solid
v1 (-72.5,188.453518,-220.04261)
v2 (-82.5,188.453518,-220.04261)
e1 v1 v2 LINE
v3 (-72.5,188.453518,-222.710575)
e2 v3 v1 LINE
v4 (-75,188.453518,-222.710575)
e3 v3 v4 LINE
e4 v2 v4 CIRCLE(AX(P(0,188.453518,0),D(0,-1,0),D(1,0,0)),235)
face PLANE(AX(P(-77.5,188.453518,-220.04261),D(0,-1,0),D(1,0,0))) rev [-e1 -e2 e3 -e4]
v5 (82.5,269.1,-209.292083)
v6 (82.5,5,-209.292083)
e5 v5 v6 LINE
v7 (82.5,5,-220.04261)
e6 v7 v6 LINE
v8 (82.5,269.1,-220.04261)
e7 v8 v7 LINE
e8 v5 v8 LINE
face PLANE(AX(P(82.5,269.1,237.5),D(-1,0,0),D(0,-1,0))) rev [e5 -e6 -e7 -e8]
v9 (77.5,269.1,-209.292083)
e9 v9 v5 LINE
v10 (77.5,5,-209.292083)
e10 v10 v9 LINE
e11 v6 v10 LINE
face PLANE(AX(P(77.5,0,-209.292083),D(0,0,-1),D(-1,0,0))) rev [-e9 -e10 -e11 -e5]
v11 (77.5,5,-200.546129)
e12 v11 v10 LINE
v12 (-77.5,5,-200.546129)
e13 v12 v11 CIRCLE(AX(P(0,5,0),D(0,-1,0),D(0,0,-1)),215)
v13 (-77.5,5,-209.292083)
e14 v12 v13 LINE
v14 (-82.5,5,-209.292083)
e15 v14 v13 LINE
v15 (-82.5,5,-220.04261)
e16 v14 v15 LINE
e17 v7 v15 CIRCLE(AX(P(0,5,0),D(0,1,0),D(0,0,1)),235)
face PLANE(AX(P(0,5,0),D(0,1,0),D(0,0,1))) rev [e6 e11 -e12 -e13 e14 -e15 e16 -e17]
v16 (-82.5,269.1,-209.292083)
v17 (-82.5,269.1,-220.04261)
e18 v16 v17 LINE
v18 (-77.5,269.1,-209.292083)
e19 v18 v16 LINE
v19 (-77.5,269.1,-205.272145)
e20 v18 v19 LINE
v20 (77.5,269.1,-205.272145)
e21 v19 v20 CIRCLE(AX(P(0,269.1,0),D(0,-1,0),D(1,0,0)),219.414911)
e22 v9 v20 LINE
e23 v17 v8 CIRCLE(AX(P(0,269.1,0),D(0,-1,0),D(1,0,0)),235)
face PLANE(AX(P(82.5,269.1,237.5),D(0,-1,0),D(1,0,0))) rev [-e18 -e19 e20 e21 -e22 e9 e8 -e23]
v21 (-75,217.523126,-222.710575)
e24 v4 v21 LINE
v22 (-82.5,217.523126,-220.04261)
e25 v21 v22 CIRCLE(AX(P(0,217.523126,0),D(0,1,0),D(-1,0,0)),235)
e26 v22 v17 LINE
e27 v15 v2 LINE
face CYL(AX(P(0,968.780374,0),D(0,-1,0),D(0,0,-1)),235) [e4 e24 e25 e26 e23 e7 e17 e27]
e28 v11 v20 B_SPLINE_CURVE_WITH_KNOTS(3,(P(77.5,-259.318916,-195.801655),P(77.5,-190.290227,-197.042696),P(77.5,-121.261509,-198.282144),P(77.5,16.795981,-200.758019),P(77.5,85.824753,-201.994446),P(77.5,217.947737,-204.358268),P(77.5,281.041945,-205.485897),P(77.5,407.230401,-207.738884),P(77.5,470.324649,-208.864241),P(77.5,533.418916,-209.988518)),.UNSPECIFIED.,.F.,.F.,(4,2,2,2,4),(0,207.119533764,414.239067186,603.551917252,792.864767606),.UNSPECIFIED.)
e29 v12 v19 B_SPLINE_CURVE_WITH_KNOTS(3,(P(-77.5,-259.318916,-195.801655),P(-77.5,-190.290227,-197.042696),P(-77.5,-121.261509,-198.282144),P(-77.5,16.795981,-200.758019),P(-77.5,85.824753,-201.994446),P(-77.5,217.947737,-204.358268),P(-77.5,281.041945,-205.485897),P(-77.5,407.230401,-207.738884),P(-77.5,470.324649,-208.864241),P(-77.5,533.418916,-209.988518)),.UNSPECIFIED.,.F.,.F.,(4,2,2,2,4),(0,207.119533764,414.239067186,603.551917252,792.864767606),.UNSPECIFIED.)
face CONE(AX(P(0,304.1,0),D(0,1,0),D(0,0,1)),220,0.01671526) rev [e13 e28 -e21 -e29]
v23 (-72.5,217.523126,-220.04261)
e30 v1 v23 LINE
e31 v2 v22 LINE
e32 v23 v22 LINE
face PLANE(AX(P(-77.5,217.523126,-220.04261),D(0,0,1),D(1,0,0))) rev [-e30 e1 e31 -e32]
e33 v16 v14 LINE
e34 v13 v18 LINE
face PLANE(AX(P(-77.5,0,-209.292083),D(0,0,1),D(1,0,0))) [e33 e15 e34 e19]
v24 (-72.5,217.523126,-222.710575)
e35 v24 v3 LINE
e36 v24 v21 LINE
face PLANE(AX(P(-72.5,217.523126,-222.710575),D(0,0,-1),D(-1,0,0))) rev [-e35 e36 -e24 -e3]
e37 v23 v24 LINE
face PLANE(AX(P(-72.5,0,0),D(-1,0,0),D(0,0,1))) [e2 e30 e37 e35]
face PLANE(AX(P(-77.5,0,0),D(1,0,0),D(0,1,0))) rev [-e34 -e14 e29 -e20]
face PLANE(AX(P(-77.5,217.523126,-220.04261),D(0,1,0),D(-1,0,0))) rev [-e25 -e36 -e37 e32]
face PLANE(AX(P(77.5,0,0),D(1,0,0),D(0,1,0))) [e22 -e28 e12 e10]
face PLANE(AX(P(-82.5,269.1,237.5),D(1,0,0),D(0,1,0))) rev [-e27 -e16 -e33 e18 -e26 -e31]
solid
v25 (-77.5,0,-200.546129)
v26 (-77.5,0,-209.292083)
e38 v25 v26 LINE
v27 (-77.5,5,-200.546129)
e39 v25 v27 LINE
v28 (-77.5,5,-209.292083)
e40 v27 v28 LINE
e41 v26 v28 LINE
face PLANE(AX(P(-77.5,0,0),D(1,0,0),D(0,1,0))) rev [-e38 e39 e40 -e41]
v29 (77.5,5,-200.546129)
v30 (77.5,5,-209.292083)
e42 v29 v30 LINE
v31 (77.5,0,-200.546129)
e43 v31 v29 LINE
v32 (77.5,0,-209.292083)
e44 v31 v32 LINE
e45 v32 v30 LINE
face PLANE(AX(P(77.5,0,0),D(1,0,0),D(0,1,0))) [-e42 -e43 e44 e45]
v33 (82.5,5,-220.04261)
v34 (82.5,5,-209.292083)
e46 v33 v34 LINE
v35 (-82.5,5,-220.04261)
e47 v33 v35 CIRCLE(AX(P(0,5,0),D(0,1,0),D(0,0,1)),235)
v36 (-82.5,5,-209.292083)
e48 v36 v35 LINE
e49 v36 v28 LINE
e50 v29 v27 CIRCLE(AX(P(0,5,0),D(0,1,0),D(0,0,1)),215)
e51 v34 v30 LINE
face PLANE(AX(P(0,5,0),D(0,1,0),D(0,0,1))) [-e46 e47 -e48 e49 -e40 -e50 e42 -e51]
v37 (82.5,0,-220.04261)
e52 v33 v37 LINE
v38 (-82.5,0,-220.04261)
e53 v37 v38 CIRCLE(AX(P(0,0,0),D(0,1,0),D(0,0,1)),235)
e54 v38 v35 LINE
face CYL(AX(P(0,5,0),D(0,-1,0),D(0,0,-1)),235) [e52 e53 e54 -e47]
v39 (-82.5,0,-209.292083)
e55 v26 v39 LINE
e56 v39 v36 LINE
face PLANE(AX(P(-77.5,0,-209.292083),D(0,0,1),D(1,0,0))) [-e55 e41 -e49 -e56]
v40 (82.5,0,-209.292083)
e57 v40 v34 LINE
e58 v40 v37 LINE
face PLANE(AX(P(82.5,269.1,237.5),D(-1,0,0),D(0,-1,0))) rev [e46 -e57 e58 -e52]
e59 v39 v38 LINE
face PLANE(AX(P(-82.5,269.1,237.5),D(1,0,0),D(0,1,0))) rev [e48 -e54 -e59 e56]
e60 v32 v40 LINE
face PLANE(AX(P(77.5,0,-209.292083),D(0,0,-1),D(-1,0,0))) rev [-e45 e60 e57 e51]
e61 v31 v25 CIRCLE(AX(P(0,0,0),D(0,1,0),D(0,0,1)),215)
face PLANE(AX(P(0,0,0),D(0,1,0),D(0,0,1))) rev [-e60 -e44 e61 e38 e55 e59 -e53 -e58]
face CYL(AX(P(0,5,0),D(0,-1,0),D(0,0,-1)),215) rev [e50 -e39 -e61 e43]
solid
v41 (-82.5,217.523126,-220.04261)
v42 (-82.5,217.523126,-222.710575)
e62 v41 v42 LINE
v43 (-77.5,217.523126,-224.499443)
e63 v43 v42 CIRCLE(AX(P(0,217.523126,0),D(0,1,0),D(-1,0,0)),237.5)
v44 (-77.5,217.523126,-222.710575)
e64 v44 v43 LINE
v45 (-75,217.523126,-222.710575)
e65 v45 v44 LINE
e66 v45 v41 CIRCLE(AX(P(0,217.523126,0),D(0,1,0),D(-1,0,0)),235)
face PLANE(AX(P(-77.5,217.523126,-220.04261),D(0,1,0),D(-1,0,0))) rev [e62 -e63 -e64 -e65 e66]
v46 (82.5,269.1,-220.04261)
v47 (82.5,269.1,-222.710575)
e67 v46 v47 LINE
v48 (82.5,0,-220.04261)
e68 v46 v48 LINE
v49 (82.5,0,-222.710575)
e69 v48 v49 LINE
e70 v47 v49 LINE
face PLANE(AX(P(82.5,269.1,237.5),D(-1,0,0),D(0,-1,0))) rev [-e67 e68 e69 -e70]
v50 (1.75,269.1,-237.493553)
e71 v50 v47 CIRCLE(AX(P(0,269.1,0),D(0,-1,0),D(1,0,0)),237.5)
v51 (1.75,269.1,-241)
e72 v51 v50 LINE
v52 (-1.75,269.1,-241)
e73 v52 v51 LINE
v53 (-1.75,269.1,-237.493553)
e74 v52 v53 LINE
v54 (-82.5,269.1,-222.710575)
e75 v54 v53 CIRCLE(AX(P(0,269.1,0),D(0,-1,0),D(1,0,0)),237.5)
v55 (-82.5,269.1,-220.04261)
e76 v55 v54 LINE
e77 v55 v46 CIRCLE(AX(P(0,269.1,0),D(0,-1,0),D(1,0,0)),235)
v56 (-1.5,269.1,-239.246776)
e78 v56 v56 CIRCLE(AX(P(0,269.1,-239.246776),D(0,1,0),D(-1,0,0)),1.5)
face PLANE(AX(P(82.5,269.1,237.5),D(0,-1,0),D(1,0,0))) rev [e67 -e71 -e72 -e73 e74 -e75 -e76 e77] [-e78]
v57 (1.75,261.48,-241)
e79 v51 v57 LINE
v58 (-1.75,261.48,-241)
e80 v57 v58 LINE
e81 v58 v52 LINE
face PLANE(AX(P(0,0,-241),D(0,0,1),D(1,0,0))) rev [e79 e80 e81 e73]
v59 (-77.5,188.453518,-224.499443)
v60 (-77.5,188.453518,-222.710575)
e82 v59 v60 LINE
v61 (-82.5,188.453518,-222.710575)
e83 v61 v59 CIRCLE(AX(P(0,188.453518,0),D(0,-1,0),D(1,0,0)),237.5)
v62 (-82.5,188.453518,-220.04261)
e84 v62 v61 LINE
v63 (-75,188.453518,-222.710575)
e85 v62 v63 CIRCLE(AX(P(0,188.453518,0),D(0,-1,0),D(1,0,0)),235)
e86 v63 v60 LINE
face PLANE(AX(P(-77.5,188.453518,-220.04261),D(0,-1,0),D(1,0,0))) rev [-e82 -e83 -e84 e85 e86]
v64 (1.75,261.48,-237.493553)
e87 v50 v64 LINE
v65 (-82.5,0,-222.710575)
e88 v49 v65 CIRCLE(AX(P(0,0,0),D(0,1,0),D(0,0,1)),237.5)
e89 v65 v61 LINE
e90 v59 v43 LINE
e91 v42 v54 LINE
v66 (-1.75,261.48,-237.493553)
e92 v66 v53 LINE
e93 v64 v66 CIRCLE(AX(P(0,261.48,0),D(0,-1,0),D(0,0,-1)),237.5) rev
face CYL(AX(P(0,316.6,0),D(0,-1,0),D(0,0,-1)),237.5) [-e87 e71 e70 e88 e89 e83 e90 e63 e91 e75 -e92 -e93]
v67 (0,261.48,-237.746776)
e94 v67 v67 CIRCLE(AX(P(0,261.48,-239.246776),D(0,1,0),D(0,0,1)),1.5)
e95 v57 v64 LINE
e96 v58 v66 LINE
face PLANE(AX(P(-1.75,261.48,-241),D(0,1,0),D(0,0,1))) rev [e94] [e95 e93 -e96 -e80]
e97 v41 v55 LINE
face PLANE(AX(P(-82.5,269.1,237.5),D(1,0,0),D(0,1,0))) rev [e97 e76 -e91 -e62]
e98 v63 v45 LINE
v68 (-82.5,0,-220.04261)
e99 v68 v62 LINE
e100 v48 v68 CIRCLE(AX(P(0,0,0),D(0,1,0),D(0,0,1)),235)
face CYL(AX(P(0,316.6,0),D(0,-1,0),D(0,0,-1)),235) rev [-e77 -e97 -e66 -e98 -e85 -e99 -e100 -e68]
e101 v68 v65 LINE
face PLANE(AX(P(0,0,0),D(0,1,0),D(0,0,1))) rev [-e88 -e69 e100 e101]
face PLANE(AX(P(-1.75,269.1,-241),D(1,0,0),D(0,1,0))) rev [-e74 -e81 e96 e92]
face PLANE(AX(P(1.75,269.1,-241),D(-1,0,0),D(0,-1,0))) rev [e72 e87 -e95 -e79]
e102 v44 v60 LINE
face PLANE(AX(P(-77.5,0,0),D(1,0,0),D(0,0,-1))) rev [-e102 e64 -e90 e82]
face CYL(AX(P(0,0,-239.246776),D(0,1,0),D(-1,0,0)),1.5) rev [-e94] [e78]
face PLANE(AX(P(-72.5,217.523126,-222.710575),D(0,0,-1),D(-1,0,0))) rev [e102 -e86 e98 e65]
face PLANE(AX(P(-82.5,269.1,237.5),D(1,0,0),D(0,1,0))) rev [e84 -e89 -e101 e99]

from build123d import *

# Parameters (mm, degrees)
SKETCH1_R                            = 237.5
SKETCH1_R_2                          = 235
BOSS_EXTRUDE1_DEPTH                  = 316.6
SKETCH3_R                            = 235
SKETCH3_R_2                          = 215
BOSS_EXTRUDE2_DEPTH                  = 5
SKETCH7_R                            = 237.5
SKETCH7_R_2                          = 175
BOSS_EXTRUDE3_DEPTH                  = 2.5
SKETCH8_R                            = 235
SKETCH8_R_2                          = 175
BOSS_EXTRUDE4_DEPTH                  = 2.5
SKETCH9_R                            = 235
BOSS_EXTRUDE5_DEPTH                  = 299.1
CUT_EXTRUDE5_REACH                   = 621.561
SKETCH5_W                            = 42.50000009
SKETCH5_H                            = 45.600000066
CUT_EXTRUDE10_START                  = -475.0000001
CUT_EXTRUDE10_DEPTH                  = 475.0000001
CUT_EXTRUDE10_2_DEPTH                = 50.034190288
SKETCH16_W                           = 3.5
SKETCH16_H                           = 7.62
BOSS_EXTRUDE6_DEPTH                  = 3.5
BOSS_EXTRUDE6_DIRECTION_2_REACH      = 286.146
BOSS_EXTRUDE6_DIRECTION_2_END_RADIUS = 237.5
SKETCH17_R                           = 1.5
CUT_EXTRUDE11_DEPTH                  = 371.542926011
CUT_EXTRUDE15_DEPTH                  = 5
CUT_EXTRUDE16_DEPTH                  = 5
SKETCH20_W                           = 10.655659882
SKETCH20_H                           = 29.069608239
CUT_EXTRUDE17_DEPTH                  = 5
SKETCH21_W                           = 2.667965003
SKETCH21_H                           = 29.069608239
CUT_EXTRUDE18_DEPTH                  = 5


# Read off the part's stored shape, not the designer's step: Cut-Extrude10
with BuildPart() as part:
    # Sketch1 → Boss-Extrude1 (new body)
    with BuildSketch(Plane(origin=(0, 0, 0), x_dir=(1, 0, 0), z_dir=(0, 1, 0))):
        with Locations(Location((0, 0, 0), (0, 0, 270))):
            Circle(SKETCH1_R)
        with Locations(Location((0, 0, 0), (0, 0, 270))):
            Circle(SKETCH1_R_2, mode=Mode.SUBTRACT)
    extrude(amount=BOSS_EXTRUDE1_DEPTH)


with BuildPart() as body_2:
    # Sketch3 → Boss-Extrude2 (new body)
    with BuildSketch(Plane(origin=(0, 0, 0), x_dir=(1, 0, 0), z_dir=(0, 1, 0))):
        with Locations(Location((0, 0, 0), (0, 0, 270))):
            Circle(SKETCH3_R)
        with Locations(Location((0, 0, 0), (0, 0, 270))):
            Circle(SKETCH3_R_2, mode=Mode.SUBTRACT)
    extrude(amount=BOSS_EXTRUDE2_DEPTH)


with BuildPart() as body_3:
    # Sketch7 → Boss-Extrude3 (new body)
    with BuildSketch(Plane(origin=(0, 316.6, 0), x_dir=(1, 0, 0), z_dir=(0, 1, 0))):
        with Locations(Location((0, 0, 0), (0, 0, 270))):
            Circle(SKETCH7_R)
        with Locations(Location((0, 0, 0), (0, 0, 270))):
            Circle(SKETCH7_R_2, mode=Mode.SUBTRACT)
    extrude(amount=BOSS_EXTRUDE3_DEPTH)


with BuildPart() as body_4:
    # Sketch8 → Boss-Extrude4 (new body)
    with BuildSketch(Plane(origin=(0, 306.6, 0), x_dir=(1, 0, 0), z_dir=(0, 1, 0))):
        with Locations(Location((0, 0, 0), (0, 0, 270))):
            Circle(SKETCH8_R)
        with Locations(Location((0, 0, 0), (0, 0, 270))):
            Circle(SKETCH8_R_2, mode=Mode.SUBTRACT)
    extrude(amount=-BOSS_EXTRUDE4_DEPTH)


with BuildPart() as body_5:
    # Sketch9 → Boss-Extrude5 (new body)
    with BuildSketch(Plane(origin=(0, 5, 0), x_dir=(1, 0, 0), z_dir=(0, 1, 0))):
        with Locations(Location((0, 0, 0), (0, 0, 270))):
            Circle(SKETCH9_R)
    extrude(amount=BOSS_EXTRUDE5_DEPTH)

    # Sketch13 → Cut-Revolve2 (revolve, cut)
    with BuildSketch(Plane.XY, mode=Mode.PRIVATE) as cut_revolve2_sk:
        Polygon((0, 5), (-215, 5), (-220, 304.1), (0, 304.1), align=None)
    revolve(cut_revolve2_sk.sketch.rotate(Axis((0, 5, 0), (0, 1, 0)), 270), axis=Axis((0, 5, 0), (0, 1, 0)), mode=Mode.SUBTRACT)


with BuildPart() as cut_extrude5_tool:
    # Cut-Extrude5: up to this cone (the profile starts outside it)
    cut_extrude5_end = Plane(origin=(0, 22.8, 0), z_dir=(0, 1, 0)) * Cone(201.299589446, 229.295529243, 1674.717118689, mode=Mode.PRIVATE)
    # Sketch5 → Cut-Extrude5 (new, up to the surface)
    with BuildSketch(Plane.XY.offset(237.5), mode=Mode.PRIVATE) as cut_extrude5_sk1:
        with Locations((0, 22.800000033)):
            Rectangle(SKETCH5_W, SKETCH5_H)
    cut_extrude5_tool1 = extrude(cut_extrude5_sk1.sketch, amount=-CUT_EXTRUDE5_REACH, mode=Mode.PRIVATE) - cut_extrude5_end
    add(cut_extrude5_tool1.solids().sort_by_distance((0, 22.8, 237.5))[0])


with BuildPart() as part_1:
    add(part.part)

    # Cut-Extrude5: cut by cut_extrude5_tool
    add(cut_extrude5_tool.part, mode=Mode.SUBTRACT)


with BuildPart() as body_2_1:
    add(body_2.part)

    # Cut-Extrude5: cut by cut_extrude5_tool
    add(cut_extrude5_tool.part, mode=Mode.SUBTRACT)


with BuildPart() as body_5_1:
    add(body_5.part)

    # Cut-Extrude5: cut by cut_extrude5_tool
    add(cut_extrude5_tool.part, mode=Mode.SUBTRACT)


with BuildPart() as cut_extrude10_tool:
    # Cut-Extrude10 outline → Cut-Extrude10 (new body)
    with BuildSketch(Plane(origin=(0, 0, -237.5), x_dir=(-1, 0, 0), z_dir=(0, 0, -1)).offset(CUT_EXTRUDE10_START)):
        Polygon((-82.5, 269.1), (82.5, 269.1), (82.5, 5), (82.5, 0), (334.900743923, 0), (334.900743923, 341.395751283), (-301.356566018, 341.395751283), (-301.356566018, 0), (-82.5, 0), (-82.5, 5), align=None)
    extrude(amount=CUT_EXTRUDE10_DEPTH)


with BuildPart() as part_2:
    add(part_1.part)

    # Cut-Extrude10: cut by cut_extrude10_tool
    add(cut_extrude10_tool.part, mode=Mode.SUBTRACT)


with BuildPart() as body_2_2:
    add(body_2_1.part)

    # Cut-Extrude10: cut by cut_extrude10_tool
    add(cut_extrude10_tool.part, mode=Mode.SUBTRACT)


with BuildPart() as body_3_1:
    add(body_3.part)

    # Cut-Extrude10: cut by cut_extrude10_tool
    add(cut_extrude10_tool.part, mode=Mode.SUBTRACT)


with BuildPart() as body_4_1:
    add(body_4.part)

    # Cut-Extrude10: cut by cut_extrude10_tool
    add(cut_extrude10_tool.part, mode=Mode.SUBTRACT)


with BuildPart() as body_5_2:
    add(body_5_1.part)

    # Cut-Extrude10: cut by cut_extrude10_tool
    add(cut_extrude10_tool.part, mode=Mode.SUBTRACT)


with BuildPart() as cut_extrude10_2_tool:
    # Cut-Extrude10 2 outline → Cut-Extrude10 2 (new body)
    with BuildSketch(Plane(origin=(0, 0, -237.5), x_dir=(-1, 0, 0), z_dir=(0, 0, -1)).offset(CUT_EXTRUDE10_START)):
        Polygon((82.5, 269.1), (-82.5, 269.1), (-82.5, 0), (-21.250000045, 0), (-21.250000045, 45.600000066), (21.250000045, 45.600000066), (21.250000045, 0), (82.5, 0), align=None)
    extrude(amount=CUT_EXTRUDE10_2_DEPTH)


with BuildPart() as part_3:
    add(part_2.part)

    # Cut-Extrude10 2: cut by cut_extrude10_2_tool
    add(cut_extrude10_2_tool.part, mode=Mode.SUBTRACT)

    # Sketch16 → Boss-Extrude6 (add)
    with BuildSketch(Plane(origin=(0, 0, -237.5), x_dir=(-1, 0, 0), z_dir=(0, 0, -1))):
        with Locations((0, 265.29)):
            Rectangle(SKETCH16_W, SKETCH16_H)
    extrude(amount=BOSS_EXTRUDE6_DEPTH)

    # Boss-Extrude6 direction 2: up to this cylinder (the profile starts outside it)
    boss_extrude6_direction_2_end = Plane(origin=(0, 265.29, 0), z_dir=(0, -1, 0)) * Cylinder(BOSS_EXTRUDE6_DIRECTION_2_END_RADIUS, 1048.292, mode=Mode.PRIVATE)
    # Sketch16 → Boss-Extrude6 direction 2 (add, up to the surface)
    with BuildSketch(Plane(origin=(0, 0, -237.5), x_dir=(-1, 0, 0), z_dir=(0, 0, -1)), mode=Mode.PRIVATE) as boss_extrude6_direction_2_sk1:
        with Locations((0, 265.29)):
            Rectangle(SKETCH16_W, SKETCH16_H)
    boss_extrude6_direction_2_tool1 = extrude(boss_extrude6_direction_2_sk1.sketch, amount=-BOSS_EXTRUDE6_DIRECTION_2_REACH, mode=Mode.PRIVATE) - boss_extrude6_direction_2_end
    add(boss_extrude6_direction_2_tool1.solids().sort_by_distance((0, 265.29, -237.5))[0])
    add(boss_extrude6_direction_2_tool1.solids().sort_by_distance((0, 265.29, -237.5))[1])

    # Sketch17 → Cut-Extrude11 (cut, through all)
    with BuildSketch(Plane(origin=(0, 269.1, 0), x_dir=(1, 0, 0), z_dir=(0, 1, 0))):
        with Locations(Location((0, 239.246776272, 0), (0, 0, 180))):
            Circle(SKETCH17_R)
    extrude(amount=-CUT_EXTRUDE11_DEPTH, mode=Mode.SUBTRACT)


with BuildPart() as body_2_3:
    add(body_2_2.part)

    # Cut-Extrude10 2: cut by cut_extrude10_2_tool
    add(cut_extrude10_2_tool.part, mode=Mode.SUBTRACT)


with BuildPart() as body_5_3:
    add(body_5_2.part)

    # Cut-Extrude10 2: cut by cut_extrude10_2_tool
    add(cut_extrude10_2_tool.part, mode=Mode.SUBTRACT)


with BuildPart() as cut_extrude15_tool:
    # Sketch19 → Cut-Extrude15 (new body)
    with BuildSketch(Plane.ZY.offset(82.5)):
        Polygon((-198.541557363, 0), (-209.292083436, 0), (-209.292083436, 269.1), (-203.252536555, 269.1), (-198.541557363, 5), align=None)
    extrude(amount=-CUT_EXTRUDE15_DEPTH)


with BuildPart() as body_2_4:
    add(body_2_3.part)

    # Cut-Extrude15: cut by cut_extrude15_tool
    add(cut_extrude15_tool.part, mode=Mode.SUBTRACT)


with BuildPart() as body_5_4:
    add(body_5_3.part)

    # Cut-Extrude15: cut by cut_extrude15_tool
    add(cut_extrude15_tool.part, mode=Mode.SUBTRACT)


with BuildPart() as cut_extrude16_tool:
    # Sketch18 → Cut-Extrude16 (new body)
    with BuildSketch(Plane(origin=(82.5, 0, 0), x_dir=(0, 0, -1), z_dir=(1, 0, 0))):
        Polygon((198.541557363, 0), (209.292083436, 0), (209.292083436, 269.1), (203.31417399, 269.1), (198.541557363, 5), align=None)
    extrude(amount=-CUT_EXTRUDE16_DEPTH)


with BuildPart() as body_2_5:
    add(body_2_4.part)

    # Cut-Extrude16: cut by cut_extrude16_tool
    add(cut_extrude16_tool.part, mode=Mode.SUBTRACT)


with BuildPart() as body_5_5:
    add(body_5_4.part)

    # Cut-Extrude16: cut by cut_extrude16_tool
    add(cut_extrude16_tool.part, mode=Mode.SUBTRACT)


with BuildPart() as cut_extrude17_tool:
    # Sketch20 → Cut-Extrude17 (new body)
    with BuildSketch(Plane.ZY.offset(82.5)):
        with Locations((-225.370439451, 202.988321817)):
            Rectangle(SKETCH20_W, SKETCH20_H)
    extrude(amount=-CUT_EXTRUDE17_DEPTH)


with BuildPart() as part_4:
    add(part_3.part)

    # Cut-Extrude17: cut by cut_extrude17_tool
    add(cut_extrude17_tool.part, mode=Mode.SUBTRACT)


with BuildPart() as body_5_6:
    add(body_5_5.part)

    # Cut-Extrude17: cut by cut_extrude17_tool
    add(cut_extrude17_tool.part, mode=Mode.SUBTRACT)


with BuildPart() as cut_extrude18_tool:
    # Sketch21 → Cut-Extrude18 (new body)
    with BuildSketch(Plane.ZY.offset(77.5)):
        with Locations((-221.376592012, 202.988321817)):
            Rectangle(SKETCH21_W, SKETCH21_H)
    extrude(amount=-CUT_EXTRUDE18_DEPTH)


with BuildPart() as part_5:
    add(part_4.part)

    # Cut-Extrude18: cut by cut_extrude18_tool
    add(cut_extrude18_tool.part, mode=Mode.SUBTRACT)


with BuildPart() as body_5_7:
    add(body_5_6.part)

    # Cut-Extrude18: cut by cut_extrude18_tool
    add(cut_extrude18_tool.part, mode=Mode.SUBTRACT)


solid = Compound([body_2_5.part, part_5.part, body_5_7.part])
